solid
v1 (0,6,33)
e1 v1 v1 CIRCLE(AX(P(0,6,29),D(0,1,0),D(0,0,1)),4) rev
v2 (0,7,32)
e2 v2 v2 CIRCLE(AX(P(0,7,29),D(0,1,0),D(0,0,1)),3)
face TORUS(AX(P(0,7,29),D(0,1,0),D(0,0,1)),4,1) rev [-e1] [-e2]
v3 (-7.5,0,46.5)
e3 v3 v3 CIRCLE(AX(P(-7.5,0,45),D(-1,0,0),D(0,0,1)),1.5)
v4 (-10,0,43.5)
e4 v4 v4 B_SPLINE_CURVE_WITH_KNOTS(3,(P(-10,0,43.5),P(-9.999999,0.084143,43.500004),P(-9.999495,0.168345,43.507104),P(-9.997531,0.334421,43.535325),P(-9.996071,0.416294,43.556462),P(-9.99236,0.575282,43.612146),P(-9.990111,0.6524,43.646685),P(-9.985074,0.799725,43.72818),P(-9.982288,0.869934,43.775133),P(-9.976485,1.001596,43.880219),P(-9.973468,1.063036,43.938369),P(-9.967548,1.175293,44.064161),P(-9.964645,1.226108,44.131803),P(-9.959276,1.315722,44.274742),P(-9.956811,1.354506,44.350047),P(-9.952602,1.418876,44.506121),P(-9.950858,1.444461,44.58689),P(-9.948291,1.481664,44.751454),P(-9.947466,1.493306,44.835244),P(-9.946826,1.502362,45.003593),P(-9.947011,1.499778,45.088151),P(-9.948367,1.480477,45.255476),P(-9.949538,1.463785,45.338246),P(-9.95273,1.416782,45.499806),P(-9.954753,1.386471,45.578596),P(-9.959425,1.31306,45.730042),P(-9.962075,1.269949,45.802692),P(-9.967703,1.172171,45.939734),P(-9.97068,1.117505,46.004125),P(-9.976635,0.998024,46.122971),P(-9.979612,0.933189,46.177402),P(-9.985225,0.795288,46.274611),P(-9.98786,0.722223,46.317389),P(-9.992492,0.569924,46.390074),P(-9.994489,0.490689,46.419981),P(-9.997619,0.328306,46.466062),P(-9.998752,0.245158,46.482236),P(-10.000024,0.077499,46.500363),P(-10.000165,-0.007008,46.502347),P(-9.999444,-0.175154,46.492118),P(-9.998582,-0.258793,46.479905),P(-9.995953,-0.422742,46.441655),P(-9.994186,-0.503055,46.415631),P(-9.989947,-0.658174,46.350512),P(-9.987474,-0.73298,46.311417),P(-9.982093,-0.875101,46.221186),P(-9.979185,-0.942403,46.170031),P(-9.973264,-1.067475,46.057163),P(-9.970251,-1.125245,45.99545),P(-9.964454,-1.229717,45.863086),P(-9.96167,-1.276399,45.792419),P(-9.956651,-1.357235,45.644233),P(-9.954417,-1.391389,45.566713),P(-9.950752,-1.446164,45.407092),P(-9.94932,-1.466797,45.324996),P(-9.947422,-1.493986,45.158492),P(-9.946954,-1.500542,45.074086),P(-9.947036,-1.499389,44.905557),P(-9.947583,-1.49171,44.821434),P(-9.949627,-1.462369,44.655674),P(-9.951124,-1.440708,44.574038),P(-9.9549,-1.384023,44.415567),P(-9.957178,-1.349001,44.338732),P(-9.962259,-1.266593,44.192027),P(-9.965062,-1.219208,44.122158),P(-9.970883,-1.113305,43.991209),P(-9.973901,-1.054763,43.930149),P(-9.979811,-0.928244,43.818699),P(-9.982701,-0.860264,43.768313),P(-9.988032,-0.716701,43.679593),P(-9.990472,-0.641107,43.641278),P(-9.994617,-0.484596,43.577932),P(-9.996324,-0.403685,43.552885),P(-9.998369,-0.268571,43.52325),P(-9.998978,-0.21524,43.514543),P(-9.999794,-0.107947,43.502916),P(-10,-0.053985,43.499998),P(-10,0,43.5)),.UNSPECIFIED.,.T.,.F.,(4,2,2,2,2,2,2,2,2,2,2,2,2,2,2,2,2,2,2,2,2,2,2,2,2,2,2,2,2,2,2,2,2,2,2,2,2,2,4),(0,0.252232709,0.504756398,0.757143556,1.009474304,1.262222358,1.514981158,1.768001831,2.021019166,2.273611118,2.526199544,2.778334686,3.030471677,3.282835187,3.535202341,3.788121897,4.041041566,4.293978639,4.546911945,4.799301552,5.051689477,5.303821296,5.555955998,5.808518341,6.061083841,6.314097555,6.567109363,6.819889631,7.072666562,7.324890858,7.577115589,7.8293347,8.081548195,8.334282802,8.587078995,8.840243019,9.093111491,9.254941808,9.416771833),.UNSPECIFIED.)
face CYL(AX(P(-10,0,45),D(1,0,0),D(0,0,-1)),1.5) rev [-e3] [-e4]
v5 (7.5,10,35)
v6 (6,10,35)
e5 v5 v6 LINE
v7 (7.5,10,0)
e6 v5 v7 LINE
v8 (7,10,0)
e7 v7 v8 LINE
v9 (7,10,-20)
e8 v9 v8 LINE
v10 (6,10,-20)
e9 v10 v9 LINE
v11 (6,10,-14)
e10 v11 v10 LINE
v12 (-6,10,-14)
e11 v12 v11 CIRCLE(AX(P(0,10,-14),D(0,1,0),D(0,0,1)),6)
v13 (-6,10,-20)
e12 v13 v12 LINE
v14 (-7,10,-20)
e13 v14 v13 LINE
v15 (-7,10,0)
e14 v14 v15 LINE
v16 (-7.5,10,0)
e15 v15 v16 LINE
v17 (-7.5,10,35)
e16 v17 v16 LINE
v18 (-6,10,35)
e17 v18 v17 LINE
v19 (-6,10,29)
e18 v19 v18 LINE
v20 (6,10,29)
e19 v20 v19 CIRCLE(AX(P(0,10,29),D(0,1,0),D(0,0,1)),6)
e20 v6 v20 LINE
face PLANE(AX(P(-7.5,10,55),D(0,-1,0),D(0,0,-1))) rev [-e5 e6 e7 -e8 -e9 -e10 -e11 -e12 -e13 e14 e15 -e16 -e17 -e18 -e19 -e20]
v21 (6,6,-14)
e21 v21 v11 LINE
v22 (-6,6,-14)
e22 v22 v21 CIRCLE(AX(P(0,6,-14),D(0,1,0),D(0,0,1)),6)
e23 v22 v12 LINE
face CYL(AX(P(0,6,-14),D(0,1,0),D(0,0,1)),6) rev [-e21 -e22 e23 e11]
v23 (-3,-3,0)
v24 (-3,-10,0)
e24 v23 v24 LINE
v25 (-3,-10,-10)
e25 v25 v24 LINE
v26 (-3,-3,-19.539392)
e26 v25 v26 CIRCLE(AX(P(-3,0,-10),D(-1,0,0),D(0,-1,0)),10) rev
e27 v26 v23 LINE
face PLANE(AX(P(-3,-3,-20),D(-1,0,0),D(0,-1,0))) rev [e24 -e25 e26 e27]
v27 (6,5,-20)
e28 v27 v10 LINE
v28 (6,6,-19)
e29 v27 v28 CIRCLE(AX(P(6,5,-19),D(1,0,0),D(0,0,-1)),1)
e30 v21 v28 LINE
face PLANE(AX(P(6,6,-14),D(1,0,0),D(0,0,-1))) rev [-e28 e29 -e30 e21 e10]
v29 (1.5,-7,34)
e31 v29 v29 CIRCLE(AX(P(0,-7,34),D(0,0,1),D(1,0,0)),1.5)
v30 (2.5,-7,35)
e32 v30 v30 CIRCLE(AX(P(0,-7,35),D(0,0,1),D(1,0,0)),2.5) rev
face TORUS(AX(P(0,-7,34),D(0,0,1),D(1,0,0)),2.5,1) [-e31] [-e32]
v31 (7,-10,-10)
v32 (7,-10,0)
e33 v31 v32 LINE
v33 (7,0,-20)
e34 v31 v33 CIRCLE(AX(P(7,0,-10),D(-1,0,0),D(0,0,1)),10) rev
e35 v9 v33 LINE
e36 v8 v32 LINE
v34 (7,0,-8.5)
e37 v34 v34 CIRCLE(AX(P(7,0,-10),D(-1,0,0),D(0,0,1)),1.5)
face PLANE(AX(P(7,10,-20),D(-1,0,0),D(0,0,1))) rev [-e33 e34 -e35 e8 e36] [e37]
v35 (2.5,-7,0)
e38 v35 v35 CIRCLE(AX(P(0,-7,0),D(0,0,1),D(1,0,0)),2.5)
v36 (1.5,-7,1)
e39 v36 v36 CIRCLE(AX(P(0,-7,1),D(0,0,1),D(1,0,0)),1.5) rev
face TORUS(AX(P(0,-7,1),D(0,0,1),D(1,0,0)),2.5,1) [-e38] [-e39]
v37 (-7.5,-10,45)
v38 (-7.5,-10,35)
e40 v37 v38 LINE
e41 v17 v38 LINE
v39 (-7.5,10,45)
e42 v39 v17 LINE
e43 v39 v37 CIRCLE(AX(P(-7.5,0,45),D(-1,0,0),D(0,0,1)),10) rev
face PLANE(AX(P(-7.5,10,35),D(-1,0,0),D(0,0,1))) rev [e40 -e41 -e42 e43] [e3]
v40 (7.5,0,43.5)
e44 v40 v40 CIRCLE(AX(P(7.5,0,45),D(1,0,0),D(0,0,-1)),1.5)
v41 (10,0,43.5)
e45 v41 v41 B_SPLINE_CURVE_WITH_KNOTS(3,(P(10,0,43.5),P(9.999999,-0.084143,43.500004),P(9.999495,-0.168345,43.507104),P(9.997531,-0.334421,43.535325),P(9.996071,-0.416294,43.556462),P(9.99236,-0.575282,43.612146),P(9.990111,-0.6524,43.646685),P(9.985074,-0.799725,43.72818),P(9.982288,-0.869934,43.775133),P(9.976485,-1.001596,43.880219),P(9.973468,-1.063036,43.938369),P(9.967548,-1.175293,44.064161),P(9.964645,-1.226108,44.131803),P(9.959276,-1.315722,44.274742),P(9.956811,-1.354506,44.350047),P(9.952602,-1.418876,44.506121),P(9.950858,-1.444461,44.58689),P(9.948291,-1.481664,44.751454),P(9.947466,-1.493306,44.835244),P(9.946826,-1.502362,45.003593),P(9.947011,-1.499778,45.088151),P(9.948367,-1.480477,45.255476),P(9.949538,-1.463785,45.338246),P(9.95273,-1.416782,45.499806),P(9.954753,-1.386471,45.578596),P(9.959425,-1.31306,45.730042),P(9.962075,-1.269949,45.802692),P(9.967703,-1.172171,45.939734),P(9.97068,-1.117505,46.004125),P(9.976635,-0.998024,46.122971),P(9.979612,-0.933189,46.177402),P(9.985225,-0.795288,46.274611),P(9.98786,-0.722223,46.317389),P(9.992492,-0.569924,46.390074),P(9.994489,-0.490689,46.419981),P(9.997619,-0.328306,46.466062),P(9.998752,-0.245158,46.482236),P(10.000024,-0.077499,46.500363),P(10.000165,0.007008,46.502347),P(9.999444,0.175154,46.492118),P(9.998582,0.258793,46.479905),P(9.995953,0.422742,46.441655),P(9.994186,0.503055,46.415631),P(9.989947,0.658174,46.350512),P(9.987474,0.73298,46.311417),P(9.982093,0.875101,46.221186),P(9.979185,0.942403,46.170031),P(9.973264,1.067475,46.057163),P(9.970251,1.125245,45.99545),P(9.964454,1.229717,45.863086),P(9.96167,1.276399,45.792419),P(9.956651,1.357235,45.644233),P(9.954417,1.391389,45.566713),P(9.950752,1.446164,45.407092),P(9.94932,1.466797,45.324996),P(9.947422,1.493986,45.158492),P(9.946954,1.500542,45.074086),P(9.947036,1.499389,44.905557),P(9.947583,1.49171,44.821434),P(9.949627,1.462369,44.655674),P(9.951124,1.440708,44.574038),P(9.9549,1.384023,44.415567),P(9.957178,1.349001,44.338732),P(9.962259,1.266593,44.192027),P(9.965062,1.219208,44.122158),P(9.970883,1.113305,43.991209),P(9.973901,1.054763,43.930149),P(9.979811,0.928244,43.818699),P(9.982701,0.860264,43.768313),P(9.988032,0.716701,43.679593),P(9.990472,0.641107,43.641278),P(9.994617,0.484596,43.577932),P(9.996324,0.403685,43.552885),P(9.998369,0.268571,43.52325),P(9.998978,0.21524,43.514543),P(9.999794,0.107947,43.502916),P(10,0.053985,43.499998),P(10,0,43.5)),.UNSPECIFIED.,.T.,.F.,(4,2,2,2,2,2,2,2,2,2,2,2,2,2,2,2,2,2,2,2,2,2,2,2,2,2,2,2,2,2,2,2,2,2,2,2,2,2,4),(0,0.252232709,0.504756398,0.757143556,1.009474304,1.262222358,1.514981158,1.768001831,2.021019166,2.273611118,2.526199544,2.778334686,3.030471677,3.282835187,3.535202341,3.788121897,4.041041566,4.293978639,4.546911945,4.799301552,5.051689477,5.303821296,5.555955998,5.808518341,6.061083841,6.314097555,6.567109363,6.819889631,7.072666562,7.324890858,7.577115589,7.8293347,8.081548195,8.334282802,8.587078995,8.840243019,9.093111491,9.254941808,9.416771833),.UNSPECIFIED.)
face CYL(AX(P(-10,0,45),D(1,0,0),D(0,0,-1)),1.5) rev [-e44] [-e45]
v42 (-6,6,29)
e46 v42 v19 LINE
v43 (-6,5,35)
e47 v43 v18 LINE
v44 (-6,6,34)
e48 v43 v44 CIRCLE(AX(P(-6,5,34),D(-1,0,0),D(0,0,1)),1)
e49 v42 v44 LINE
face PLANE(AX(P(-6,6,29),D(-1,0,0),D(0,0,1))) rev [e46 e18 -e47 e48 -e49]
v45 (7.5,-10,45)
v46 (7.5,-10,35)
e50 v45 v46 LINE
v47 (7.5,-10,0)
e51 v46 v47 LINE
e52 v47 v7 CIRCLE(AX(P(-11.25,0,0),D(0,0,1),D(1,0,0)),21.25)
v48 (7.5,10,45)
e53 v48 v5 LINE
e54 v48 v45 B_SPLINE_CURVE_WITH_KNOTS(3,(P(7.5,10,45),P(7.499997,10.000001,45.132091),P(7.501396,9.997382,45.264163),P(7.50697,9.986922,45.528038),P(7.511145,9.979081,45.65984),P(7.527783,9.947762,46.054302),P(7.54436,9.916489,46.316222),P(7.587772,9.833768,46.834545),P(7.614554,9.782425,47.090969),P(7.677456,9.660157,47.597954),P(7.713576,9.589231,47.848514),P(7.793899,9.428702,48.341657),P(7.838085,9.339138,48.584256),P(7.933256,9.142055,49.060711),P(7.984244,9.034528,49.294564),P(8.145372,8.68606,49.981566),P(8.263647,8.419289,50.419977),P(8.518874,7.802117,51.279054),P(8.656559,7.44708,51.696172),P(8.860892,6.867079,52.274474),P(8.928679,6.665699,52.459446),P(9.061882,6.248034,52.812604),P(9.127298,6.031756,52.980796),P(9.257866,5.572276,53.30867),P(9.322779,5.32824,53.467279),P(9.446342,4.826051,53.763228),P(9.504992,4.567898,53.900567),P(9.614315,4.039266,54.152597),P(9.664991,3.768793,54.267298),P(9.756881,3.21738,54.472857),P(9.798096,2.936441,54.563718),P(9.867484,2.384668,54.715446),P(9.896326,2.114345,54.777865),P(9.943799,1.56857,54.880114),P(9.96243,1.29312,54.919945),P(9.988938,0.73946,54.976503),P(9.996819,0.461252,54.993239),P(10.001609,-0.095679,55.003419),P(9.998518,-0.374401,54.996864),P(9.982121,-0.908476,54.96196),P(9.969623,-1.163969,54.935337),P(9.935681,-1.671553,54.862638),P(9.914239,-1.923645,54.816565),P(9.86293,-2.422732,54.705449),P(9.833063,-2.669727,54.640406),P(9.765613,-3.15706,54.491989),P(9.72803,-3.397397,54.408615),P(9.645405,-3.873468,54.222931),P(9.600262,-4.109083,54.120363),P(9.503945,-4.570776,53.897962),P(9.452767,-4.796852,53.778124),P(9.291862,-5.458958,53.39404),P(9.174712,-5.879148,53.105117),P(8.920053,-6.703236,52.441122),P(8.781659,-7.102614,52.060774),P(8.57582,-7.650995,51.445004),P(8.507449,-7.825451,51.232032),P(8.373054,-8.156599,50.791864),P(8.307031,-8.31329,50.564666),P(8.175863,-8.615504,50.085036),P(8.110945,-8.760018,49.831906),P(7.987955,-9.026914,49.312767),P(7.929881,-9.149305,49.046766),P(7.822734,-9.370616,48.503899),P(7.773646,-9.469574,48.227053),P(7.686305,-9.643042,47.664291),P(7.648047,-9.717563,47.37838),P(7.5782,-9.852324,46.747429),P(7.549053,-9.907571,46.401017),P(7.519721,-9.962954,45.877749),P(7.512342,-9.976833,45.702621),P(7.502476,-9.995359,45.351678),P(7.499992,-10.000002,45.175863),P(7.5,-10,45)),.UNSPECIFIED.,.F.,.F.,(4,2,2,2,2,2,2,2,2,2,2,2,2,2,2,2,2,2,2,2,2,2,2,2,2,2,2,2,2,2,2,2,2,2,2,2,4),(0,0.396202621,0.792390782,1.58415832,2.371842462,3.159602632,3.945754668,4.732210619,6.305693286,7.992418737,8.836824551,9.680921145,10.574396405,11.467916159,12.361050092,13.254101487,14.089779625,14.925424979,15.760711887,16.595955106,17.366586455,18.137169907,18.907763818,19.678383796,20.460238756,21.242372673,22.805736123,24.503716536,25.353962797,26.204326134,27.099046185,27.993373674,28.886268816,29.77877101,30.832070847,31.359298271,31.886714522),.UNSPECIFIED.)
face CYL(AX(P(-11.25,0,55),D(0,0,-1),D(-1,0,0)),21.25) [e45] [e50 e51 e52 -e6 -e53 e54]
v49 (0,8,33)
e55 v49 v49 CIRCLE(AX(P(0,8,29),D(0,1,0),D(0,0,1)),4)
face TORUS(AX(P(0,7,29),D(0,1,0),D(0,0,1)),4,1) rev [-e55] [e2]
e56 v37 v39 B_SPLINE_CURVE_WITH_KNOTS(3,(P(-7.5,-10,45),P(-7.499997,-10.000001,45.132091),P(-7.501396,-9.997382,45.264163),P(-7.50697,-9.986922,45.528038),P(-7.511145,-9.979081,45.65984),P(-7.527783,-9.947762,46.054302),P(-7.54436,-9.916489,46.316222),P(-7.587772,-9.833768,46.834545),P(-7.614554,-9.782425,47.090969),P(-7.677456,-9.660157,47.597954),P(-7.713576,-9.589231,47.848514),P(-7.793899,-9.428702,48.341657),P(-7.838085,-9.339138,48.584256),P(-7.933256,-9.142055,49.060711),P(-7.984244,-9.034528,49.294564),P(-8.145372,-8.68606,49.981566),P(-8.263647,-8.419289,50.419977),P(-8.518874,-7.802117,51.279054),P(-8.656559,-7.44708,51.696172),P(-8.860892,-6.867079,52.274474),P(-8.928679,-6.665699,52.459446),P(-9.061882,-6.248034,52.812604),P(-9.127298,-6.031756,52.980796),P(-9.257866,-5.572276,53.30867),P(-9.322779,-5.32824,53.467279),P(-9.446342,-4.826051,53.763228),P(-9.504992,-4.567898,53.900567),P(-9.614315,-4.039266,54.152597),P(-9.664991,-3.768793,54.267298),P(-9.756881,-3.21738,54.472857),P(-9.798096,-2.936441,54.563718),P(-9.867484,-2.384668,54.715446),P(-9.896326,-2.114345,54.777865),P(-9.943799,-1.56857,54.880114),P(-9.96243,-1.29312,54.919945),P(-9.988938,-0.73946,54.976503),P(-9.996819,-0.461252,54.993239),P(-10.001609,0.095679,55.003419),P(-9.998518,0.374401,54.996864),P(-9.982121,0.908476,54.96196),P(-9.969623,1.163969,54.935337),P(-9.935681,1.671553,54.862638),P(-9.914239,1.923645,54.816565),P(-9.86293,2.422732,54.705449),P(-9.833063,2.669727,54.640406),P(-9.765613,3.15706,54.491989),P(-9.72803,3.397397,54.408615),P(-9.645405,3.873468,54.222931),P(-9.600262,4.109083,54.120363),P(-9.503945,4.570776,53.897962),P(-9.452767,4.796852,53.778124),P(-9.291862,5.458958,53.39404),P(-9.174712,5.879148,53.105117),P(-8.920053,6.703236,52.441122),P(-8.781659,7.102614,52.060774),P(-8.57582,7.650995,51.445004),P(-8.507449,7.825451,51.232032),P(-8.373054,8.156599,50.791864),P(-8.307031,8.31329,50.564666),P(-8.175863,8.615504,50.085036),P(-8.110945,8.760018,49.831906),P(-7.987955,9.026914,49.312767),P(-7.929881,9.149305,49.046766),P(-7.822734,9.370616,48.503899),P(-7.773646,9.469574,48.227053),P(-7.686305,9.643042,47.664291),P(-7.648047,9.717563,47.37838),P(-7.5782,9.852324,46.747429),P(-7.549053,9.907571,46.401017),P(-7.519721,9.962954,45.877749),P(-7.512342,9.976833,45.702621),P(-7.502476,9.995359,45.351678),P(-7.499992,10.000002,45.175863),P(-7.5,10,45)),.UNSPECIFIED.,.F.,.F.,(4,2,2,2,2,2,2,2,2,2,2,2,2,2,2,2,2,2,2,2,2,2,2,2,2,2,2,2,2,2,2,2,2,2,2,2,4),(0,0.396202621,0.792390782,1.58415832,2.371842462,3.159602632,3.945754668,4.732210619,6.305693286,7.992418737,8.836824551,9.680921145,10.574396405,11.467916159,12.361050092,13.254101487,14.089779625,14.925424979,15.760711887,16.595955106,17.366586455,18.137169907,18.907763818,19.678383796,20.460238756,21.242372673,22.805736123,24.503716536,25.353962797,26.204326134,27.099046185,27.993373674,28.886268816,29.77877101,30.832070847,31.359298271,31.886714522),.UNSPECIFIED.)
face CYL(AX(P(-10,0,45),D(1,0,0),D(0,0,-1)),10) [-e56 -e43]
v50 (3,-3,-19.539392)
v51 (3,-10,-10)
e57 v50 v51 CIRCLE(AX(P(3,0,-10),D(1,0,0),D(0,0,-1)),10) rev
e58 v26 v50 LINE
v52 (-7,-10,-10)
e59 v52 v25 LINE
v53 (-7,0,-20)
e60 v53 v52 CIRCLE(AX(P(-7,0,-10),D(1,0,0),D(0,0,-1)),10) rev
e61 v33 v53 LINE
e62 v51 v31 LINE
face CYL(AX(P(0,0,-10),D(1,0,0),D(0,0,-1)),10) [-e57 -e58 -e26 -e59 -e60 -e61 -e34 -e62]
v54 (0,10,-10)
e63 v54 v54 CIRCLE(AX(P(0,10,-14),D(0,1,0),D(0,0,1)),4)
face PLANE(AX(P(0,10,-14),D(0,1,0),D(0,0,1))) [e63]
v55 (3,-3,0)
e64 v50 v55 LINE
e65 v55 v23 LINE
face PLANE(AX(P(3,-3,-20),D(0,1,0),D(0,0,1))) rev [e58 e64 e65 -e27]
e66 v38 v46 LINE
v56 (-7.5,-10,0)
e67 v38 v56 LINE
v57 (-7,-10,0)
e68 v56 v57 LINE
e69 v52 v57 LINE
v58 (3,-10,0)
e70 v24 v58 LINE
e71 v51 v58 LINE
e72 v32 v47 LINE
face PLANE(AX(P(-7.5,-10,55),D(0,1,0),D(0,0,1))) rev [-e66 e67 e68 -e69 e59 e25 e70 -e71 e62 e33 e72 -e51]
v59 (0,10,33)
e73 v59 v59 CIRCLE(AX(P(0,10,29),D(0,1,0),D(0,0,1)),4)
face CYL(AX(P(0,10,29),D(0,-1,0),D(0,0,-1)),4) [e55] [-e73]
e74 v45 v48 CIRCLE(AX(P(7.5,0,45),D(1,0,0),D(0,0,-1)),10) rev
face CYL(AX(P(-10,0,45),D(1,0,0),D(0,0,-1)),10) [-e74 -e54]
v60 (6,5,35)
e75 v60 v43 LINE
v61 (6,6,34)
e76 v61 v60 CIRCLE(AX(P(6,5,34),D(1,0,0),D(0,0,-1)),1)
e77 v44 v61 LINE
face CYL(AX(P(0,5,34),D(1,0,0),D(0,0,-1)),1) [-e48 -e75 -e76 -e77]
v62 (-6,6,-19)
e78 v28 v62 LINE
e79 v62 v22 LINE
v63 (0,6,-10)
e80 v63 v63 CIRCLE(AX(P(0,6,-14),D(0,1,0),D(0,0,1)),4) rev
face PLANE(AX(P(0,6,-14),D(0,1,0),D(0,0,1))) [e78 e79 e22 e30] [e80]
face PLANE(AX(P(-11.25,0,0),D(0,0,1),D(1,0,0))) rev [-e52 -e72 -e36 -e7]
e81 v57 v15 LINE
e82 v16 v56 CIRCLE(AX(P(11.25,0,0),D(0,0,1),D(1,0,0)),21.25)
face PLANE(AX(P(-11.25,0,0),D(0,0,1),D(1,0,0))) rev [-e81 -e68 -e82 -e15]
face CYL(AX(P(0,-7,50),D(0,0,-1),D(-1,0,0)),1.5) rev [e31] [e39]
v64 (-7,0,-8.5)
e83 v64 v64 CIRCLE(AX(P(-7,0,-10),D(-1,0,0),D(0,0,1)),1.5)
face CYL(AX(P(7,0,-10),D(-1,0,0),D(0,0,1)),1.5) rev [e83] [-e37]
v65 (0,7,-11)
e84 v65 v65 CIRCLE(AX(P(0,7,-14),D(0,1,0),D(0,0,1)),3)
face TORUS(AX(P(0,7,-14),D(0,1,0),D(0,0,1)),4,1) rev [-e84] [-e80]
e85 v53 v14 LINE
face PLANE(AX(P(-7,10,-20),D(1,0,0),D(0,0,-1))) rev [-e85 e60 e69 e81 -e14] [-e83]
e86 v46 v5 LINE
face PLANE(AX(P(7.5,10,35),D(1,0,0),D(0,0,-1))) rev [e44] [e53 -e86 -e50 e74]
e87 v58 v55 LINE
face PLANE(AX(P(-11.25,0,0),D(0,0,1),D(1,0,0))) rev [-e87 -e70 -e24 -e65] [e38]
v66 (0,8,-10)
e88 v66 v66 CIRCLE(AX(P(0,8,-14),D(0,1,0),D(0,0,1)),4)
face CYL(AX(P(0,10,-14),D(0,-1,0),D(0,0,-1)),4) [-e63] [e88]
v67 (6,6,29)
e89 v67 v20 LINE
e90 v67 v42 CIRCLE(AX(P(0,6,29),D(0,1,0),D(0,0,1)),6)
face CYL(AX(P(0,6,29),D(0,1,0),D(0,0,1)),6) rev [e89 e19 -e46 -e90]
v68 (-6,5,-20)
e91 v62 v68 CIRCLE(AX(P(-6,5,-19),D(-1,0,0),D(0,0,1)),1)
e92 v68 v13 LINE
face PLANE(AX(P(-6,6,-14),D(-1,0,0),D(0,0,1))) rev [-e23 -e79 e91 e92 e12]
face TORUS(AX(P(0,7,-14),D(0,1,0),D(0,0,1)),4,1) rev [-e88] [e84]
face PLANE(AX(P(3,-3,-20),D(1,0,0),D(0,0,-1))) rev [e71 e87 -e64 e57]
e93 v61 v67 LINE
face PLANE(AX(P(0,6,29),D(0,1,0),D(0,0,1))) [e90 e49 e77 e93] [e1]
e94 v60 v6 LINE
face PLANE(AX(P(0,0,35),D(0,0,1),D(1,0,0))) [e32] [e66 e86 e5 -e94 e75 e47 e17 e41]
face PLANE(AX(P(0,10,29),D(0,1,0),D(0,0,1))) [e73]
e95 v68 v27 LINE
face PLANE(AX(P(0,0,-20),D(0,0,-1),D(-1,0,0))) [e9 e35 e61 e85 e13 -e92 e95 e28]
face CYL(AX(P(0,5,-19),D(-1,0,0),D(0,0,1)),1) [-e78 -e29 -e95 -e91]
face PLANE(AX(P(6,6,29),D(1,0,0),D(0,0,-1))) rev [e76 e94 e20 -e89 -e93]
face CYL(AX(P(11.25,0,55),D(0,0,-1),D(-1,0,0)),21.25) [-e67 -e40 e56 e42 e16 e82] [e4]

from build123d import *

# Parameters (mm, degrees)
SALIENTE_EXTRUIR2_DEPTH    = 55
CROQUIS4_R                 = 1.5
CORTAR_EXTRUIR1_DEPTH      = 50
SALIENTE_EXTRUIR3_DEPTH    = 20
CROQUIS8_R                 = 1.5
CORTAR_EXTRUIR4_DEPTH      = 14
REDONDEO1_R                = 10
CROQUIS6_W                 = 15
CROQUIS6_H                 = 20
CORTAR_EXTRUIR2_DEPTH      = 20
CORTAR_EXTRUIR3_DEPTH      = 57.789083458
CORTAR_EXTRUIR3_DEPTH_BACK = 57.789083458
CROQUIS7_R                 = 1.5
CUT_EXTRUDE1_DEPTH         = 4
SKETCH2_R                  = 3
BOSS_EXTRUDE1_DEPTH        = 2
SKETCH3_R                  = 4
BOSS_EXTRUDE2_DEPTH        = 2
FILLET1_R                  = 1
FILLET2_R                  = 1
FILLET3_R                  = 1


with BuildPart() as part:
    # Croquis2 → Saliente-Extruir2 (new body)
    with BuildSketch(Plane.XY):
        with BuildLine():
            Line((-7.5, -10), (7.5, -10))
            ThreePointArc((7.5, -10), (10, 0), (7.5, 10))
            Line((7.5, 10), (-7.5, 10))
            ThreePointArc((-7.5, 10), (-10, 0), (-7.5, -10))
        make_face()
    extrude(amount=SALIENTE_EXTRUIR2_DEPTH)

    # Croquis4 → Cortar-Extruir1 (cut)
    with BuildSketch(Plane(origin=(0, 0, 0), x_dir=(-1, 0, 0), z_dir=(0, 0, -1))):
        with Locations((0, -7)):
            Circle(CROQUIS4_R)
    extrude(amount=-CORTAR_EXTRUIR1_DEPTH, mode=Mode.SUBTRACT)

    # Croquis3 → Saliente-Extruir3 (add)
    with BuildSketch(Plane(origin=(0, 0, 0), x_dir=(-1, 0, 0), z_dir=(0, 0, -1))):
        Polygon((7, 10), (7, -10), (3, -10), (3, -3), (-3, -3), (-3, -10), (-7, -10), (-7, 10), align=None)
    extrude(amount=SALIENTE_EXTRUIR3_DEPTH)

    # Croquis8 → Cortar-Extruir4 (cut)
    with BuildSketch(Plane.ZY.offset(7)):
        with Locations((-10, 0)):
            Circle(CROQUIS8_R)
    extrude(amount=-CORTAR_EXTRUIR4_DEPTH, mode=Mode.SUBTRACT)

    # Redondeo1
    redondeo1_edges = [part.edges().sort_by_distance(p)[0] for p in [
        (5, -10, -20),
    ]]
    fillet(redondeo1_edges, radius=REDONDEO1_R)

    # Croquis6 → Cortar-Extruir2 (cut)
    with BuildSketch(Plane.XY.offset(55)):
        Rectangle(CROQUIS6_W, CROQUIS6_H)
    extrude(amount=-CORTAR_EXTRUIR2_DEPTH, mode=Mode.SUBTRACT)

    # Croquis7 → Cortar-Extruir3 (cut, two sides: drawn at the far end of the back side and taken through both)
    with BuildSketch(Plane(origin=(0, 0, 0), x_dir=(0, 0, -1), z_dir=(1, 0, 0)).offset(-CORTAR_EXTRUIR3_DEPTH_BACK)):
        with Locations((-45, 0)):
            Circle(CROQUIS7_R)
        with BuildLine():
            Line((-45, -10), (-60, -10))
            Line((-60, -10), (-60, 10))
            Line((-60, 10), (-45, 10))
            ThreePointArc((-45, 10), (-55, 0), (-45, -10))
        make_face()
    extrude(amount=CORTAR_EXTRUIR3_DEPTH + CORTAR_EXTRUIR3_DEPTH_BACK, mode=Mode.SUBTRACT)

    # Sketch1 → Cut-Extrude1 (cut)
    with BuildSketch(Plane(origin=(0, 10, 0), x_dir=(1, 0, 0), z_dir=(0, 1, 0))):
        with BuildLine():
            Line((-6, 14), (-6, 20))
            Line((-6, 20), (6, 20))
            Line((6, 20), (6, 14))
            ThreePointArc((6, 14), (0, 8), (-6, 14))
        make_face()
        with BuildLine():
            Line((-6, -29), (-6, -35))
            Line((-6, -35), (6, -35))
            Line((6, -35), (6, -29))
            ThreePointArc((6, -29), (0, -23), (-6, -29))
        make_face()
    extrude(amount=-CUT_EXTRUDE1_DEPTH, mode=Mode.SUBTRACT)

    # Sketch2 → Boss-Extrude1 (add)
    with BuildSketch(Plane(origin=(0, 6, 0), x_dir=(1, 0, 0), z_dir=(0, 1, 0))):
        with Locations(Location((0, -29, 0), (0, 0, 270))):
            Circle(SKETCH2_R)
        with Locations(Location((0, 14, 0), (0, 0, 270))):
            Circle(SKETCH2_R)
    extrude(amount=BOSS_EXTRUDE1_DEPTH)

    # Sketch3 → Boss-Extrude2 (add)
    with BuildSketch(Plane(origin=(0, 8, 0), x_dir=(1, 0, 0), z_dir=(0, 1, 0))):
        with Locations(Location((0, 14, 0), (0, 0, 270))):
            Circle(SKETCH3_R)
        with Locations(Location((0, -29, 0), (0, 0, 270))):
            Circle(SKETCH3_R)
    extrude(amount=BOSS_EXTRUDE2_DEPTH)

    # Fillet1
    fillet1_edges = [part.edges().sort_by_distance(p)[0] for p in [
        (0, 6, 26),
        (0, 8, 26),
        (0, 6, -17),
        (0, 8, -17),
    ]]
    fillet(fillet1_edges, radius=FILLET1_R - 0.0001)  # a hair under: the kernel refuses the full size

    # Fillet2
    fillet2_edges = [part.edges().sort_by_distance(p)[0] for p in [
        (0, 6, -20),
        (0, 6, 35),
    ]]
    fillet(fillet2_edges, radius=FILLET2_R)

    # Fillet3
    fillet3_edges = [part.edges().sort_by_distance(p)[0] for p in [
        (1.5, -7, 0),
        (1.5, -7, 35),
    ]]
    fillet(fillet3_edges, radius=FILLET3_R)


solid = part.part
